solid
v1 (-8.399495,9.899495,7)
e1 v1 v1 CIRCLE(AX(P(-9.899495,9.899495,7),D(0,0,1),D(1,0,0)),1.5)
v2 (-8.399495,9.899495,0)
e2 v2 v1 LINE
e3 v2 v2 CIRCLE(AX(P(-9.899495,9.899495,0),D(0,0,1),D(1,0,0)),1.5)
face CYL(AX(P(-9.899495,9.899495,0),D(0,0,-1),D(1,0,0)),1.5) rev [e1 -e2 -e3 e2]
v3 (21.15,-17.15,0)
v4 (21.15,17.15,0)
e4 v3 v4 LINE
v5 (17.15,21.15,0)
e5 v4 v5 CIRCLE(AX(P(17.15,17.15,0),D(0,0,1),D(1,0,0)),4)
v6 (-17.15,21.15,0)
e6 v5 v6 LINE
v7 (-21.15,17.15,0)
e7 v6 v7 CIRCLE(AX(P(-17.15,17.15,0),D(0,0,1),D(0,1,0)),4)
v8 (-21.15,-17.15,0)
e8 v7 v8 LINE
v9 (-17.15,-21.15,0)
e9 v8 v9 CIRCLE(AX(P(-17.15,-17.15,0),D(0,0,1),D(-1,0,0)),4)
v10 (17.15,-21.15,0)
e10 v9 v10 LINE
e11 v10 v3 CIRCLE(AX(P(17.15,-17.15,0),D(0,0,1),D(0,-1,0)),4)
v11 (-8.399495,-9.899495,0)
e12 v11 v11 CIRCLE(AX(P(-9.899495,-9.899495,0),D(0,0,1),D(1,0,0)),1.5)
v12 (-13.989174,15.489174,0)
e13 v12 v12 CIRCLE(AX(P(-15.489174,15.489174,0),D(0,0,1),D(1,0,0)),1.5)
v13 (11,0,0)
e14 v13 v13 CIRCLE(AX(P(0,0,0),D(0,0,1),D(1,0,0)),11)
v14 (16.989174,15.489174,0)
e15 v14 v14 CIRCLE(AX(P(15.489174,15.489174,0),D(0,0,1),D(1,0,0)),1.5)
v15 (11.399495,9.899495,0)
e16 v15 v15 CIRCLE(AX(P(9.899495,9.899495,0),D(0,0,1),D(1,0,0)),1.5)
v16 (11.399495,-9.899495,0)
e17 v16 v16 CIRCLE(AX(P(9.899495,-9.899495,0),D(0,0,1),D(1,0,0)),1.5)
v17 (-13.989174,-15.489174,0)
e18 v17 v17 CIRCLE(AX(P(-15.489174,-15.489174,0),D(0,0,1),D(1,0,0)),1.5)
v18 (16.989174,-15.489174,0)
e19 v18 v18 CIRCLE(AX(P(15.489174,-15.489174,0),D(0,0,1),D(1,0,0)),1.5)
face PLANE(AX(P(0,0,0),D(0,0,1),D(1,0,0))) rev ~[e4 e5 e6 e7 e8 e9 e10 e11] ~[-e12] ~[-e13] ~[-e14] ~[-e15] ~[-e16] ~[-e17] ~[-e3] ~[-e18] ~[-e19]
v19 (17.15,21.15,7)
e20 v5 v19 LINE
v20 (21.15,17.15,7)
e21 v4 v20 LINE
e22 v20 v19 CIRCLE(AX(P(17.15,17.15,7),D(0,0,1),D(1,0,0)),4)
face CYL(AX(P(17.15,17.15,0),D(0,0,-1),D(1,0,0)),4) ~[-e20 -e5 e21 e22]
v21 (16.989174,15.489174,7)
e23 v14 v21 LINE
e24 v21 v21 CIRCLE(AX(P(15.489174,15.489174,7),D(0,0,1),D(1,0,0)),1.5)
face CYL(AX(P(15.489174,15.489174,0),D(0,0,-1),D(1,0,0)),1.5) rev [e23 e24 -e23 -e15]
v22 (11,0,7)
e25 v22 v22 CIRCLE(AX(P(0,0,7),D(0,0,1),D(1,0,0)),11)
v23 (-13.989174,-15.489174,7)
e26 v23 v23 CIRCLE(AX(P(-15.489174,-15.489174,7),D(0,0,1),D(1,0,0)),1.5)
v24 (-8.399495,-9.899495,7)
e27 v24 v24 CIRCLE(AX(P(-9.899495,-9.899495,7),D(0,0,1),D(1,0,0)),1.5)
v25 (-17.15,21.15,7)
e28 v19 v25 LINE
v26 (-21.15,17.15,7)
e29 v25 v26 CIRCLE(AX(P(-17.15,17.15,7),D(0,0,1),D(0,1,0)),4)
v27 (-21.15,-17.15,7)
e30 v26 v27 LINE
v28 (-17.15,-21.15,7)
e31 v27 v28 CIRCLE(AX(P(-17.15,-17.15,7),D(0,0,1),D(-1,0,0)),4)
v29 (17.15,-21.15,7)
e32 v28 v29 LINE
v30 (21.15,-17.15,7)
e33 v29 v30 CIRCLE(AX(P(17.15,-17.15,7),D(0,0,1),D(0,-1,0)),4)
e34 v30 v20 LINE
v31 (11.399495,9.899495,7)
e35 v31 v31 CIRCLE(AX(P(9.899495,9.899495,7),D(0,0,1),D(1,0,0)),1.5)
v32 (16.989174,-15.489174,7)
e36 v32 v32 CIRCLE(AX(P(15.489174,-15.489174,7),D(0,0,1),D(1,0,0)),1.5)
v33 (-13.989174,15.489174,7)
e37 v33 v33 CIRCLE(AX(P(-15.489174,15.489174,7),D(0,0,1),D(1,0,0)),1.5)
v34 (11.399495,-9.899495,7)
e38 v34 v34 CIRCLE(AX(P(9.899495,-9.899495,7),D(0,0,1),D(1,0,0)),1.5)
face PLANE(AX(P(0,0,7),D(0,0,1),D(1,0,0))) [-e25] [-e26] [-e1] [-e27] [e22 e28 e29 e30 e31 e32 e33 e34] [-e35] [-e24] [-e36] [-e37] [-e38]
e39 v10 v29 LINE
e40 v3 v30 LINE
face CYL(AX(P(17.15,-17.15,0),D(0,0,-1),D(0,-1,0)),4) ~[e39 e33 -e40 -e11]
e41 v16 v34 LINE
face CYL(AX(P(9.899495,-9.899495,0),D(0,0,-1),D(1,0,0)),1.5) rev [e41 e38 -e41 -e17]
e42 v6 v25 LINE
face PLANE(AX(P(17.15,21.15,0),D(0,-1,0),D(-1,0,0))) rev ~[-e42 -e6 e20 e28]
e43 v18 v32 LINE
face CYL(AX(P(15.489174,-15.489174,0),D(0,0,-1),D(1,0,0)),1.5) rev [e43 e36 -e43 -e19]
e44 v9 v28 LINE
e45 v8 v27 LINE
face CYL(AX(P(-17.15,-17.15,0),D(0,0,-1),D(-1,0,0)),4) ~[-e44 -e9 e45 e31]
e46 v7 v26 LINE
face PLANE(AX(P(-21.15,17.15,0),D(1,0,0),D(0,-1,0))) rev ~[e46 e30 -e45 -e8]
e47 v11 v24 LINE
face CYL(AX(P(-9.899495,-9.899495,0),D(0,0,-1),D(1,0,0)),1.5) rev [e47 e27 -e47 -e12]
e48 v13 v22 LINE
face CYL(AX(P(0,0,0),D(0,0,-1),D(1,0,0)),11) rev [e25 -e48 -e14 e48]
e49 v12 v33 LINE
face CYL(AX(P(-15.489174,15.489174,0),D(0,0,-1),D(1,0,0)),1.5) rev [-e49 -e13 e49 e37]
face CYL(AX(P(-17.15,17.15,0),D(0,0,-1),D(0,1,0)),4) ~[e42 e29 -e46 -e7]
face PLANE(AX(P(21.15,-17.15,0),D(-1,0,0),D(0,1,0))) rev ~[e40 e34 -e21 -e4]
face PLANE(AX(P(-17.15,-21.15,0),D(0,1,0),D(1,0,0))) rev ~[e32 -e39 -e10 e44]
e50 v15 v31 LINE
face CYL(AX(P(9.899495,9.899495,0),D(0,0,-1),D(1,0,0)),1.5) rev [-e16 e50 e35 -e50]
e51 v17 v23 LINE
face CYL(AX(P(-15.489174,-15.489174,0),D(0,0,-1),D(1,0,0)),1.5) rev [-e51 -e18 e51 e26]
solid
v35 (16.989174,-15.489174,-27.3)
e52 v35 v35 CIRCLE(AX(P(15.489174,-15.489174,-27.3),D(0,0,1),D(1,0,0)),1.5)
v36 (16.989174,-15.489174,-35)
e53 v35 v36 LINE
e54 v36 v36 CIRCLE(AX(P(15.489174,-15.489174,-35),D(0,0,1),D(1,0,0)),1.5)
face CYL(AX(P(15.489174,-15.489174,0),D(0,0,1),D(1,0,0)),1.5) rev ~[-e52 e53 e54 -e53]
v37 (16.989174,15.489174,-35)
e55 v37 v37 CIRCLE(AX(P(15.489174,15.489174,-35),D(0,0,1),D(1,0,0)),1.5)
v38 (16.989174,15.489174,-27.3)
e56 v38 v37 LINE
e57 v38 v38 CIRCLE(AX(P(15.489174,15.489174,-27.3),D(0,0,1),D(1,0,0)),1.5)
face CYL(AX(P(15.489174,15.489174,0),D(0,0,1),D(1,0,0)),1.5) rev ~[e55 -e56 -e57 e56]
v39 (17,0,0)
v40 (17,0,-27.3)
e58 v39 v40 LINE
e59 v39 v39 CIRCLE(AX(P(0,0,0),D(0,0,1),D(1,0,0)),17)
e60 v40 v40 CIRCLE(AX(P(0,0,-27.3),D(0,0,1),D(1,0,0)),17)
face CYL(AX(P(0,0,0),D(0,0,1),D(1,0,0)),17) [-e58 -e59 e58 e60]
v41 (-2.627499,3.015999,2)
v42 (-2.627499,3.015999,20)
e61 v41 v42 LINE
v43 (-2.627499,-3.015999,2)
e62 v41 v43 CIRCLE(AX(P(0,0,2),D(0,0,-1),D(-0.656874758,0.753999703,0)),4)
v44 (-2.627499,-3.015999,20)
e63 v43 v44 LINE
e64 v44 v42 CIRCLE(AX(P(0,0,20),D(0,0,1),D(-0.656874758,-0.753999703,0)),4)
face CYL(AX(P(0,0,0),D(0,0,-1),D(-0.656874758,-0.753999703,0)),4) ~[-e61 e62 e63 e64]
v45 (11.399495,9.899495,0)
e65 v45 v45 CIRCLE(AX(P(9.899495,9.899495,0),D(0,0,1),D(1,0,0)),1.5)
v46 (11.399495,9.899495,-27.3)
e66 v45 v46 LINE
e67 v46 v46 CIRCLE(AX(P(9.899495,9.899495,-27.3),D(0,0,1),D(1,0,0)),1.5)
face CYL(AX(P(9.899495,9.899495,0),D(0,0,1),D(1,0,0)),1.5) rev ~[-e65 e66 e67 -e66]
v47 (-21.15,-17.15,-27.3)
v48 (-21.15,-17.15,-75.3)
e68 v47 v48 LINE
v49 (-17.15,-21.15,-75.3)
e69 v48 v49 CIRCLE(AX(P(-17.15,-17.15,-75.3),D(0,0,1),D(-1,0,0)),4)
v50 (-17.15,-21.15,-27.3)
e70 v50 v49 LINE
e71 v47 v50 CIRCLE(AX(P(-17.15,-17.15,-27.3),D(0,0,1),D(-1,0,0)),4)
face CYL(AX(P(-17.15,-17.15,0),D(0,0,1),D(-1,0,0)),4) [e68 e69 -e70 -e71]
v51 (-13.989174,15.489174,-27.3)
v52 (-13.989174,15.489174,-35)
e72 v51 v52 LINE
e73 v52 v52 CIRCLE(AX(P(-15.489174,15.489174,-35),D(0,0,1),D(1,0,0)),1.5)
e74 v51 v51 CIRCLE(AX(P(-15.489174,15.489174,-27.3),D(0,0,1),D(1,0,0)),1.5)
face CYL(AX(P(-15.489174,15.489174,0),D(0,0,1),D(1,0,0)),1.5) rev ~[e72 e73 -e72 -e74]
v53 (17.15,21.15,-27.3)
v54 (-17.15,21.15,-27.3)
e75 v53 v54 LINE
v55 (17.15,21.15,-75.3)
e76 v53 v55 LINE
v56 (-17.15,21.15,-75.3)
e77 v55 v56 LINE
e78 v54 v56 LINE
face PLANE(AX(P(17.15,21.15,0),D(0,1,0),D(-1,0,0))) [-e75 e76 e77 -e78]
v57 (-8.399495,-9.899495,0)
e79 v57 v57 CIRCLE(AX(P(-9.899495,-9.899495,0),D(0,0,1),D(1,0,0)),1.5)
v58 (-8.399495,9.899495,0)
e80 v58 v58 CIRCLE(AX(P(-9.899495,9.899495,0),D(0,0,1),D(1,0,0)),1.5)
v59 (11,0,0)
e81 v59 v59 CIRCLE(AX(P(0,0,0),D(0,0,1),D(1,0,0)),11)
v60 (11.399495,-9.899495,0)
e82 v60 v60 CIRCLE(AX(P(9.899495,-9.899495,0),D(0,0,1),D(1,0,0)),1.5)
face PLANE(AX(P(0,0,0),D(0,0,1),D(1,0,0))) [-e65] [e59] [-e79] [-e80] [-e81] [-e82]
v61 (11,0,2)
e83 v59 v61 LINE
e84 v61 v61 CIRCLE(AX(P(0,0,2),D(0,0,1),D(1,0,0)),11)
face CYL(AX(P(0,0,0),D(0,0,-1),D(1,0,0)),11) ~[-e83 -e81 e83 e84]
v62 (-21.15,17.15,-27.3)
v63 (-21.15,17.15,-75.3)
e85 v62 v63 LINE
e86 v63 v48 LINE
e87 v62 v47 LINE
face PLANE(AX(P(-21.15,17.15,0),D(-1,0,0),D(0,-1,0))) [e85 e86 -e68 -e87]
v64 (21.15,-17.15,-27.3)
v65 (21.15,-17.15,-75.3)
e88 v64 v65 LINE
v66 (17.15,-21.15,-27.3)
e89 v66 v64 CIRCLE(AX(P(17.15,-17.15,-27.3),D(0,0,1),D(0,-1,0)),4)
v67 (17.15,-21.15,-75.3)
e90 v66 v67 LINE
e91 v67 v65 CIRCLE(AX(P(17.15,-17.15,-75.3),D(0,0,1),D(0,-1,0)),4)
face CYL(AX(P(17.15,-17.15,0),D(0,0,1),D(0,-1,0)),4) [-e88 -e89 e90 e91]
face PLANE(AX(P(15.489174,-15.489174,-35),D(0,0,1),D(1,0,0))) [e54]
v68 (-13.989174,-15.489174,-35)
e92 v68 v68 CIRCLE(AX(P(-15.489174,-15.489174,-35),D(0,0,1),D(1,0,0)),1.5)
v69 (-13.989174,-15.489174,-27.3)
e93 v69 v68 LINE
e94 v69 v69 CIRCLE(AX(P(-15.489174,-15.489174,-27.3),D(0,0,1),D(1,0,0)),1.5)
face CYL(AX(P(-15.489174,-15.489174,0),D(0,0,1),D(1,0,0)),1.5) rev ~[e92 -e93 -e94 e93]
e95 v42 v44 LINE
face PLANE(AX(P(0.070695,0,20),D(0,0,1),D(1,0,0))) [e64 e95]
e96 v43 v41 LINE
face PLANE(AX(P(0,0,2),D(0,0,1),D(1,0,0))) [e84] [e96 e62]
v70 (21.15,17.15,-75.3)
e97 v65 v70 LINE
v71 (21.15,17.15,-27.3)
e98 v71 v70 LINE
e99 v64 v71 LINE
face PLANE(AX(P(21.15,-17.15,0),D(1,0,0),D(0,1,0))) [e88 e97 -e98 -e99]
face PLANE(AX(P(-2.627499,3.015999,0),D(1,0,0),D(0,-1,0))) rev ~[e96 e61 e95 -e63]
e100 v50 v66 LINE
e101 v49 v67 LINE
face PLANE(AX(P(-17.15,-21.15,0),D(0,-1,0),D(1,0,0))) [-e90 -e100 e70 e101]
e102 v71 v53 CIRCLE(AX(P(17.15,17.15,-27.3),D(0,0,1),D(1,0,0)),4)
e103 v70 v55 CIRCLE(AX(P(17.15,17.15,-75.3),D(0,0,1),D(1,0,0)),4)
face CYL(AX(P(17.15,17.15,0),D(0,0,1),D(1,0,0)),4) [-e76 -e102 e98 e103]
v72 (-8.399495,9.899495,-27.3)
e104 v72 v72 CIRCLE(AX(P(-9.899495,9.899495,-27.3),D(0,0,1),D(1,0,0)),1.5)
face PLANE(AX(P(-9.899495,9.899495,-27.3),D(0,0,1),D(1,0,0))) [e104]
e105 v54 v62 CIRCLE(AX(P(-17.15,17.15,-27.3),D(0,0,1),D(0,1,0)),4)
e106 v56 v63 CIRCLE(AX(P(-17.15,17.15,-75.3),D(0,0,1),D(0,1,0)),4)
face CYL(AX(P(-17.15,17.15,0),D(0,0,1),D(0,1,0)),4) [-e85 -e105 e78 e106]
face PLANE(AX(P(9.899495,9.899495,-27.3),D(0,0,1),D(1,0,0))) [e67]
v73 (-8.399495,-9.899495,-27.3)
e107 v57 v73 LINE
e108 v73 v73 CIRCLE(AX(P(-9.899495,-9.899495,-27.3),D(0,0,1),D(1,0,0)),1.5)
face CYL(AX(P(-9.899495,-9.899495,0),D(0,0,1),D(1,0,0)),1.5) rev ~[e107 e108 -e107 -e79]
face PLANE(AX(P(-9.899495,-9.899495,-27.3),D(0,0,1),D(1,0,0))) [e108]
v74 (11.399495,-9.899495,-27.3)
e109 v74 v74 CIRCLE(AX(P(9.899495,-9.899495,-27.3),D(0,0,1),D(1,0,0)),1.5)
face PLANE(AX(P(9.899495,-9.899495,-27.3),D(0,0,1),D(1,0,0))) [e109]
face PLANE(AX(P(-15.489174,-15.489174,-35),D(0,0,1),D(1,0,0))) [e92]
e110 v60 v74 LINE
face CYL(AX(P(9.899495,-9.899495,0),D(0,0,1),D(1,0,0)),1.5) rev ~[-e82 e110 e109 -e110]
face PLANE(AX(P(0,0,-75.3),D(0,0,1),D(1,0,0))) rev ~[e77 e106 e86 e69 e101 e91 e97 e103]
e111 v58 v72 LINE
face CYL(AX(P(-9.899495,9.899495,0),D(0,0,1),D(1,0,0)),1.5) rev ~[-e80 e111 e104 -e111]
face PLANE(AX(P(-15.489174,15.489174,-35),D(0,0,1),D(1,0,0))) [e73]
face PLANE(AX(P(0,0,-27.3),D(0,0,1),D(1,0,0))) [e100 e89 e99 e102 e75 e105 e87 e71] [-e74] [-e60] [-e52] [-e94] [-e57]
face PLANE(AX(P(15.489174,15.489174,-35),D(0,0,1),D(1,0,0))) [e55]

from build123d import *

# Parameters (mm, degrees)
F0_R      = 1.5
F0_R_2    = 17
F0_R_3    = 11
F1_DEPTH  = 7
F2_DEPTH  = 20
F3_DEPTH  = 2
F3_FACE_R = 11
F4_DEPTH  = 75.3
F5_DEPTH  = 27.3
F6_DEPTH  = 35


with BuildPart() as f1:
    # F0 (on Top) → F1 (new body)
    with BuildSketch(Plane.XY):
        with BuildLine():
            ThreePointArc((-21.15, -17.15), (-19.9784271247, -19.9784271247), (-17.15, -21.15))
            Line((-17.15, -21.15), (17.15, -21.15))
            ThreePointArc((17.15, -21.15), (19.9784271247, -19.9784271247), (21.15, -17.15))
            Line((21.15, -17.15), (21.15, 17.15))
            ThreePointArc((21.15, 17.15), (19.9784271247, 19.9784271247), (17.15, 21.15))
            Line((17.15, 21.15), (-17.15, 21.15))
            ThreePointArc((-17.15, 21.15), (-19.9784271247, 19.9784271247), (-21.15, 17.15))
            Line((-21.15, 17.15), (-21.15, -17.15))
        make_face()
        with Locations((-15.4891740419, -15.4891740419)):
            Circle(F0_R, mode=Mode.SUBTRACT)
        with Locations((15.4891740419, -15.4891740419)):
            Circle(F0_R, mode=Mode.SUBTRACT)
        Circle(F0_R_2, mode=Mode.SUBTRACT)
        with Locations((-15.4891740419, 15.4891740419)):
            Circle(F0_R, mode=Mode.SUBTRACT)
        with Locations((15.4891740419, 15.4891740419)):
            Circle(F0_R, mode=Mode.SUBTRACT)
        Circle(F0_R_2)
        with Locations((-9.8994949366, -9.8994949366)):
            Circle(F0_R, mode=Mode.SUBTRACT)
        with Locations((9.8994949366, -9.8994949366)):
            Circle(F0_R, mode=Mode.SUBTRACT)
        Circle(F0_R_3, mode=Mode.SUBTRACT)
        with Locations((-9.8994949366, 9.8994949366)):
            Circle(F0_R, mode=Mode.SUBTRACT)
        with Locations((9.8994949366, 9.8994949366)):
            Circle(F0_R, mode=Mode.SUBTRACT)
    extrude(amount=F1_DEPTH)


with BuildPart() as f2:
    # F0 (on Top) → F2 (new body)
    with BuildSketch(Plane.XY):
        with BuildLine():
            Line((-2.627499033, 3.0159988116), (-2.627499033, -3.0159988116))
            ThreePointArc((-2.627499033, -3.0159988116), (4, 0), (-2.627499033, 3.0159988116))
        make_face()
    extrude(amount=F2_DEPTH)

    # F0 (on Top) → F3 (join)
    with BuildSketch(Plane.XY):
        Circle(F0_R_3)
        with BuildLine():
            ThreePointArc((-2.627499033, 3.0159988116), (4, 0), (-2.627499033, -3.0159988116))
            Line((-2.627499033, -3.0159988116), (-2.627499033, 3.0159988116))
        make_face(mode=Mode.SUBTRACT)
    extrude(amount=F3_DEPTH)

    # F0 (on Top) + F3_face (on face) → F4 (join)
    with BuildSketch(Plane.XY):
        with BuildLine():
            ThreePointArc((-21.15, -17.15), (-19.9784271247, -19.9784271247), (-17.15, -21.15))
            Line((-17.15, -21.15), (17.15, -21.15))
            ThreePointArc((17.15, -21.15), (19.9784271247, -19.9784271247), (21.15, -17.15))
            Line((21.15, -17.15), (21.15, 17.15))
            ThreePointArc((21.15, 17.15), (19.9784271247, 19.9784271247), (17.15, 21.15))
            Line((17.15, 21.15), (-17.15, 21.15))
            ThreePointArc((-17.15, 21.15), (-19.9784271247, 19.9784271247), (-21.15, 17.15))
            Line((-21.15, 17.15), (-21.15, -17.15))
        make_face()
        with Locations((-15.4891740419, -15.4891740419)):
            Circle(F0_R, mode=Mode.SUBTRACT)
        with Locations((15.4891740419, -15.4891740419)):
            Circle(F0_R, mode=Mode.SUBTRACT)
        Circle(F0_R_2, mode=Mode.SUBTRACT)
        with Locations((-15.4891740419, 15.4891740419)):
            Circle(F0_R, mode=Mode.SUBTRACT)
        with Locations((15.4891740419, 15.4891740419)):
            Circle(F0_R, mode=Mode.SUBTRACT)
        Circle(F0_R_2)
        with Locations((-9.8994949366, -9.8994949366)):
            Circle(F0_R, mode=Mode.SUBTRACT)
        with Locations((9.8994949366, -9.8994949366)):
            Circle(F0_R, mode=Mode.SUBTRACT)
        Circle(F0_R_3, mode=Mode.SUBTRACT)
        with Locations((-9.8994949366, 9.8994949366)):
            Circle(F0_R, mode=Mode.SUBTRACT)
        with Locations((9.8994949366, 9.8994949366)):
            Circle(F0_R, mode=Mode.SUBTRACT)
        Circle(F0_R_3)
        with BuildLine():
            ThreePointArc((-2.627499033, 3.0159988116), (4, 0), (-2.627499033, -3.0159988116))
            Line((-2.627499033, -3.0159988116), (-2.627499033, 3.0159988116))
        make_face(mode=Mode.SUBTRACT)
        with BuildLine():
            Line((-2.627499033, 3.0159988116), (-2.627499033, -3.0159988116))
            ThreePointArc((-2.627499033, -3.0159988116), (4, 0), (-2.627499033, 3.0159988116))
        make_face()
        with Locations((15.4891740419, 15.4891740419)):
            Circle(F0_R)
        with Locations((9.8994949366, -9.8994949366)):
            Circle(F0_R)
        with Locations((-15.4891740419, 15.4891740419)):
            Circle(F0_R)
        with Locations((-9.8994949366, 9.8994949366)):
            Circle(F0_R)
        with Locations((15.4891740419, -15.4891740419)):
            Circle(F0_R)
        with Locations((9.8994949366, 9.8994949366)):
            Circle(F0_R)
        with Locations((-9.8994949366, -9.8994949366)):
            Circle(F0_R)
        with Locations((-15.4891740419, -15.4891740419)):
            Circle(F0_R)
    with BuildSketch(Plane(origin=(0, 0, 0), x_dir=(1, 0, 0), z_dir=(0, 0, -1))):
        Circle(F3_FACE_R)
    extrude(amount=-F4_DEPTH, dir=(0, 0, 1))

    # F0 (on Top) → F5 (cut)
    with BuildSketch(Plane.XY):
        with BuildLine():
            ThreePointArc((-21.15, -17.15), (-19.9784271247, -19.9784271247), (-17.15, -21.15))
            Line((-17.15, -21.15), (17.15, -21.15))
            ThreePointArc((17.15, -21.15), (19.9784271247, -19.9784271247), (21.15, -17.15))
            Line((21.15, -17.15), (21.15, 17.15))
            ThreePointArc((21.15, 17.15), (19.9784271247, 19.9784271247), (17.15, 21.15))
            Line((17.15, 21.15), (-17.15, 21.15))
            ThreePointArc((-17.15, 21.15), (-19.9784271247, 19.9784271247), (-21.15, 17.15))
            Line((-21.15, 17.15), (-21.15, -17.15))
        make_face()
        with Locations((-15.4891740419, -15.4891740419)):
            Circle(F0_R, mode=Mode.SUBTRACT)
        with Locations((15.4891740419, -15.4891740419)):
            Circle(F0_R, mode=Mode.SUBTRACT)
        Circle(F0_R_2, mode=Mode.SUBTRACT)
        with Locations((-15.4891740419, 15.4891740419)):
            Circle(F0_R, mode=Mode.SUBTRACT)
        with Locations((15.4891740419, 15.4891740419)):
            Circle(F0_R, mode=Mode.SUBTRACT)
        with Locations((15.4891740419, -15.4891740419)):
            Circle(F0_R)
        with Locations((15.4891740419, 15.4891740419)):
            Circle(F0_R)
        with Locations((9.8994949366, 9.8994949366)):
            Circle(F0_R)
        with Locations((9.8994949366, -9.8994949366)):
            Circle(F0_R)
        with Locations((-9.8994949366, -9.8994949366)):
            Circle(F0_R)
        with Locations((-9.8994949366, 9.8994949366)):
            Circle(F0_R)
        with Locations((-15.4891740419, 15.4891740419)):
            Circle(F0_R)
        with Locations((-15.4891740419, -15.4891740419)):
            Circle(F0_R)
    extrude(amount=-F5_DEPTH, mode=Mode.SUBTRACT)

    # F0 (on Top) → F6 (cut)
    with BuildSketch(Plane.XY):
        with Locations((15.4891740419, -15.4891740419)):
            Circle(F0_R)
        with Locations((-15.4891740419, 15.4891740419)):
            Circle(F0_R)
        with Locations((15.4891740419, 15.4891740419)):
            Circle(F0_R)
        with Locations((-15.4891740419, -15.4891740419)):
            Circle(F0_R)
    extrude(amount=-F6_DEPTH, mode=Mode.SUBTRACT)


solid = Compound([f1.part, f2.part])
